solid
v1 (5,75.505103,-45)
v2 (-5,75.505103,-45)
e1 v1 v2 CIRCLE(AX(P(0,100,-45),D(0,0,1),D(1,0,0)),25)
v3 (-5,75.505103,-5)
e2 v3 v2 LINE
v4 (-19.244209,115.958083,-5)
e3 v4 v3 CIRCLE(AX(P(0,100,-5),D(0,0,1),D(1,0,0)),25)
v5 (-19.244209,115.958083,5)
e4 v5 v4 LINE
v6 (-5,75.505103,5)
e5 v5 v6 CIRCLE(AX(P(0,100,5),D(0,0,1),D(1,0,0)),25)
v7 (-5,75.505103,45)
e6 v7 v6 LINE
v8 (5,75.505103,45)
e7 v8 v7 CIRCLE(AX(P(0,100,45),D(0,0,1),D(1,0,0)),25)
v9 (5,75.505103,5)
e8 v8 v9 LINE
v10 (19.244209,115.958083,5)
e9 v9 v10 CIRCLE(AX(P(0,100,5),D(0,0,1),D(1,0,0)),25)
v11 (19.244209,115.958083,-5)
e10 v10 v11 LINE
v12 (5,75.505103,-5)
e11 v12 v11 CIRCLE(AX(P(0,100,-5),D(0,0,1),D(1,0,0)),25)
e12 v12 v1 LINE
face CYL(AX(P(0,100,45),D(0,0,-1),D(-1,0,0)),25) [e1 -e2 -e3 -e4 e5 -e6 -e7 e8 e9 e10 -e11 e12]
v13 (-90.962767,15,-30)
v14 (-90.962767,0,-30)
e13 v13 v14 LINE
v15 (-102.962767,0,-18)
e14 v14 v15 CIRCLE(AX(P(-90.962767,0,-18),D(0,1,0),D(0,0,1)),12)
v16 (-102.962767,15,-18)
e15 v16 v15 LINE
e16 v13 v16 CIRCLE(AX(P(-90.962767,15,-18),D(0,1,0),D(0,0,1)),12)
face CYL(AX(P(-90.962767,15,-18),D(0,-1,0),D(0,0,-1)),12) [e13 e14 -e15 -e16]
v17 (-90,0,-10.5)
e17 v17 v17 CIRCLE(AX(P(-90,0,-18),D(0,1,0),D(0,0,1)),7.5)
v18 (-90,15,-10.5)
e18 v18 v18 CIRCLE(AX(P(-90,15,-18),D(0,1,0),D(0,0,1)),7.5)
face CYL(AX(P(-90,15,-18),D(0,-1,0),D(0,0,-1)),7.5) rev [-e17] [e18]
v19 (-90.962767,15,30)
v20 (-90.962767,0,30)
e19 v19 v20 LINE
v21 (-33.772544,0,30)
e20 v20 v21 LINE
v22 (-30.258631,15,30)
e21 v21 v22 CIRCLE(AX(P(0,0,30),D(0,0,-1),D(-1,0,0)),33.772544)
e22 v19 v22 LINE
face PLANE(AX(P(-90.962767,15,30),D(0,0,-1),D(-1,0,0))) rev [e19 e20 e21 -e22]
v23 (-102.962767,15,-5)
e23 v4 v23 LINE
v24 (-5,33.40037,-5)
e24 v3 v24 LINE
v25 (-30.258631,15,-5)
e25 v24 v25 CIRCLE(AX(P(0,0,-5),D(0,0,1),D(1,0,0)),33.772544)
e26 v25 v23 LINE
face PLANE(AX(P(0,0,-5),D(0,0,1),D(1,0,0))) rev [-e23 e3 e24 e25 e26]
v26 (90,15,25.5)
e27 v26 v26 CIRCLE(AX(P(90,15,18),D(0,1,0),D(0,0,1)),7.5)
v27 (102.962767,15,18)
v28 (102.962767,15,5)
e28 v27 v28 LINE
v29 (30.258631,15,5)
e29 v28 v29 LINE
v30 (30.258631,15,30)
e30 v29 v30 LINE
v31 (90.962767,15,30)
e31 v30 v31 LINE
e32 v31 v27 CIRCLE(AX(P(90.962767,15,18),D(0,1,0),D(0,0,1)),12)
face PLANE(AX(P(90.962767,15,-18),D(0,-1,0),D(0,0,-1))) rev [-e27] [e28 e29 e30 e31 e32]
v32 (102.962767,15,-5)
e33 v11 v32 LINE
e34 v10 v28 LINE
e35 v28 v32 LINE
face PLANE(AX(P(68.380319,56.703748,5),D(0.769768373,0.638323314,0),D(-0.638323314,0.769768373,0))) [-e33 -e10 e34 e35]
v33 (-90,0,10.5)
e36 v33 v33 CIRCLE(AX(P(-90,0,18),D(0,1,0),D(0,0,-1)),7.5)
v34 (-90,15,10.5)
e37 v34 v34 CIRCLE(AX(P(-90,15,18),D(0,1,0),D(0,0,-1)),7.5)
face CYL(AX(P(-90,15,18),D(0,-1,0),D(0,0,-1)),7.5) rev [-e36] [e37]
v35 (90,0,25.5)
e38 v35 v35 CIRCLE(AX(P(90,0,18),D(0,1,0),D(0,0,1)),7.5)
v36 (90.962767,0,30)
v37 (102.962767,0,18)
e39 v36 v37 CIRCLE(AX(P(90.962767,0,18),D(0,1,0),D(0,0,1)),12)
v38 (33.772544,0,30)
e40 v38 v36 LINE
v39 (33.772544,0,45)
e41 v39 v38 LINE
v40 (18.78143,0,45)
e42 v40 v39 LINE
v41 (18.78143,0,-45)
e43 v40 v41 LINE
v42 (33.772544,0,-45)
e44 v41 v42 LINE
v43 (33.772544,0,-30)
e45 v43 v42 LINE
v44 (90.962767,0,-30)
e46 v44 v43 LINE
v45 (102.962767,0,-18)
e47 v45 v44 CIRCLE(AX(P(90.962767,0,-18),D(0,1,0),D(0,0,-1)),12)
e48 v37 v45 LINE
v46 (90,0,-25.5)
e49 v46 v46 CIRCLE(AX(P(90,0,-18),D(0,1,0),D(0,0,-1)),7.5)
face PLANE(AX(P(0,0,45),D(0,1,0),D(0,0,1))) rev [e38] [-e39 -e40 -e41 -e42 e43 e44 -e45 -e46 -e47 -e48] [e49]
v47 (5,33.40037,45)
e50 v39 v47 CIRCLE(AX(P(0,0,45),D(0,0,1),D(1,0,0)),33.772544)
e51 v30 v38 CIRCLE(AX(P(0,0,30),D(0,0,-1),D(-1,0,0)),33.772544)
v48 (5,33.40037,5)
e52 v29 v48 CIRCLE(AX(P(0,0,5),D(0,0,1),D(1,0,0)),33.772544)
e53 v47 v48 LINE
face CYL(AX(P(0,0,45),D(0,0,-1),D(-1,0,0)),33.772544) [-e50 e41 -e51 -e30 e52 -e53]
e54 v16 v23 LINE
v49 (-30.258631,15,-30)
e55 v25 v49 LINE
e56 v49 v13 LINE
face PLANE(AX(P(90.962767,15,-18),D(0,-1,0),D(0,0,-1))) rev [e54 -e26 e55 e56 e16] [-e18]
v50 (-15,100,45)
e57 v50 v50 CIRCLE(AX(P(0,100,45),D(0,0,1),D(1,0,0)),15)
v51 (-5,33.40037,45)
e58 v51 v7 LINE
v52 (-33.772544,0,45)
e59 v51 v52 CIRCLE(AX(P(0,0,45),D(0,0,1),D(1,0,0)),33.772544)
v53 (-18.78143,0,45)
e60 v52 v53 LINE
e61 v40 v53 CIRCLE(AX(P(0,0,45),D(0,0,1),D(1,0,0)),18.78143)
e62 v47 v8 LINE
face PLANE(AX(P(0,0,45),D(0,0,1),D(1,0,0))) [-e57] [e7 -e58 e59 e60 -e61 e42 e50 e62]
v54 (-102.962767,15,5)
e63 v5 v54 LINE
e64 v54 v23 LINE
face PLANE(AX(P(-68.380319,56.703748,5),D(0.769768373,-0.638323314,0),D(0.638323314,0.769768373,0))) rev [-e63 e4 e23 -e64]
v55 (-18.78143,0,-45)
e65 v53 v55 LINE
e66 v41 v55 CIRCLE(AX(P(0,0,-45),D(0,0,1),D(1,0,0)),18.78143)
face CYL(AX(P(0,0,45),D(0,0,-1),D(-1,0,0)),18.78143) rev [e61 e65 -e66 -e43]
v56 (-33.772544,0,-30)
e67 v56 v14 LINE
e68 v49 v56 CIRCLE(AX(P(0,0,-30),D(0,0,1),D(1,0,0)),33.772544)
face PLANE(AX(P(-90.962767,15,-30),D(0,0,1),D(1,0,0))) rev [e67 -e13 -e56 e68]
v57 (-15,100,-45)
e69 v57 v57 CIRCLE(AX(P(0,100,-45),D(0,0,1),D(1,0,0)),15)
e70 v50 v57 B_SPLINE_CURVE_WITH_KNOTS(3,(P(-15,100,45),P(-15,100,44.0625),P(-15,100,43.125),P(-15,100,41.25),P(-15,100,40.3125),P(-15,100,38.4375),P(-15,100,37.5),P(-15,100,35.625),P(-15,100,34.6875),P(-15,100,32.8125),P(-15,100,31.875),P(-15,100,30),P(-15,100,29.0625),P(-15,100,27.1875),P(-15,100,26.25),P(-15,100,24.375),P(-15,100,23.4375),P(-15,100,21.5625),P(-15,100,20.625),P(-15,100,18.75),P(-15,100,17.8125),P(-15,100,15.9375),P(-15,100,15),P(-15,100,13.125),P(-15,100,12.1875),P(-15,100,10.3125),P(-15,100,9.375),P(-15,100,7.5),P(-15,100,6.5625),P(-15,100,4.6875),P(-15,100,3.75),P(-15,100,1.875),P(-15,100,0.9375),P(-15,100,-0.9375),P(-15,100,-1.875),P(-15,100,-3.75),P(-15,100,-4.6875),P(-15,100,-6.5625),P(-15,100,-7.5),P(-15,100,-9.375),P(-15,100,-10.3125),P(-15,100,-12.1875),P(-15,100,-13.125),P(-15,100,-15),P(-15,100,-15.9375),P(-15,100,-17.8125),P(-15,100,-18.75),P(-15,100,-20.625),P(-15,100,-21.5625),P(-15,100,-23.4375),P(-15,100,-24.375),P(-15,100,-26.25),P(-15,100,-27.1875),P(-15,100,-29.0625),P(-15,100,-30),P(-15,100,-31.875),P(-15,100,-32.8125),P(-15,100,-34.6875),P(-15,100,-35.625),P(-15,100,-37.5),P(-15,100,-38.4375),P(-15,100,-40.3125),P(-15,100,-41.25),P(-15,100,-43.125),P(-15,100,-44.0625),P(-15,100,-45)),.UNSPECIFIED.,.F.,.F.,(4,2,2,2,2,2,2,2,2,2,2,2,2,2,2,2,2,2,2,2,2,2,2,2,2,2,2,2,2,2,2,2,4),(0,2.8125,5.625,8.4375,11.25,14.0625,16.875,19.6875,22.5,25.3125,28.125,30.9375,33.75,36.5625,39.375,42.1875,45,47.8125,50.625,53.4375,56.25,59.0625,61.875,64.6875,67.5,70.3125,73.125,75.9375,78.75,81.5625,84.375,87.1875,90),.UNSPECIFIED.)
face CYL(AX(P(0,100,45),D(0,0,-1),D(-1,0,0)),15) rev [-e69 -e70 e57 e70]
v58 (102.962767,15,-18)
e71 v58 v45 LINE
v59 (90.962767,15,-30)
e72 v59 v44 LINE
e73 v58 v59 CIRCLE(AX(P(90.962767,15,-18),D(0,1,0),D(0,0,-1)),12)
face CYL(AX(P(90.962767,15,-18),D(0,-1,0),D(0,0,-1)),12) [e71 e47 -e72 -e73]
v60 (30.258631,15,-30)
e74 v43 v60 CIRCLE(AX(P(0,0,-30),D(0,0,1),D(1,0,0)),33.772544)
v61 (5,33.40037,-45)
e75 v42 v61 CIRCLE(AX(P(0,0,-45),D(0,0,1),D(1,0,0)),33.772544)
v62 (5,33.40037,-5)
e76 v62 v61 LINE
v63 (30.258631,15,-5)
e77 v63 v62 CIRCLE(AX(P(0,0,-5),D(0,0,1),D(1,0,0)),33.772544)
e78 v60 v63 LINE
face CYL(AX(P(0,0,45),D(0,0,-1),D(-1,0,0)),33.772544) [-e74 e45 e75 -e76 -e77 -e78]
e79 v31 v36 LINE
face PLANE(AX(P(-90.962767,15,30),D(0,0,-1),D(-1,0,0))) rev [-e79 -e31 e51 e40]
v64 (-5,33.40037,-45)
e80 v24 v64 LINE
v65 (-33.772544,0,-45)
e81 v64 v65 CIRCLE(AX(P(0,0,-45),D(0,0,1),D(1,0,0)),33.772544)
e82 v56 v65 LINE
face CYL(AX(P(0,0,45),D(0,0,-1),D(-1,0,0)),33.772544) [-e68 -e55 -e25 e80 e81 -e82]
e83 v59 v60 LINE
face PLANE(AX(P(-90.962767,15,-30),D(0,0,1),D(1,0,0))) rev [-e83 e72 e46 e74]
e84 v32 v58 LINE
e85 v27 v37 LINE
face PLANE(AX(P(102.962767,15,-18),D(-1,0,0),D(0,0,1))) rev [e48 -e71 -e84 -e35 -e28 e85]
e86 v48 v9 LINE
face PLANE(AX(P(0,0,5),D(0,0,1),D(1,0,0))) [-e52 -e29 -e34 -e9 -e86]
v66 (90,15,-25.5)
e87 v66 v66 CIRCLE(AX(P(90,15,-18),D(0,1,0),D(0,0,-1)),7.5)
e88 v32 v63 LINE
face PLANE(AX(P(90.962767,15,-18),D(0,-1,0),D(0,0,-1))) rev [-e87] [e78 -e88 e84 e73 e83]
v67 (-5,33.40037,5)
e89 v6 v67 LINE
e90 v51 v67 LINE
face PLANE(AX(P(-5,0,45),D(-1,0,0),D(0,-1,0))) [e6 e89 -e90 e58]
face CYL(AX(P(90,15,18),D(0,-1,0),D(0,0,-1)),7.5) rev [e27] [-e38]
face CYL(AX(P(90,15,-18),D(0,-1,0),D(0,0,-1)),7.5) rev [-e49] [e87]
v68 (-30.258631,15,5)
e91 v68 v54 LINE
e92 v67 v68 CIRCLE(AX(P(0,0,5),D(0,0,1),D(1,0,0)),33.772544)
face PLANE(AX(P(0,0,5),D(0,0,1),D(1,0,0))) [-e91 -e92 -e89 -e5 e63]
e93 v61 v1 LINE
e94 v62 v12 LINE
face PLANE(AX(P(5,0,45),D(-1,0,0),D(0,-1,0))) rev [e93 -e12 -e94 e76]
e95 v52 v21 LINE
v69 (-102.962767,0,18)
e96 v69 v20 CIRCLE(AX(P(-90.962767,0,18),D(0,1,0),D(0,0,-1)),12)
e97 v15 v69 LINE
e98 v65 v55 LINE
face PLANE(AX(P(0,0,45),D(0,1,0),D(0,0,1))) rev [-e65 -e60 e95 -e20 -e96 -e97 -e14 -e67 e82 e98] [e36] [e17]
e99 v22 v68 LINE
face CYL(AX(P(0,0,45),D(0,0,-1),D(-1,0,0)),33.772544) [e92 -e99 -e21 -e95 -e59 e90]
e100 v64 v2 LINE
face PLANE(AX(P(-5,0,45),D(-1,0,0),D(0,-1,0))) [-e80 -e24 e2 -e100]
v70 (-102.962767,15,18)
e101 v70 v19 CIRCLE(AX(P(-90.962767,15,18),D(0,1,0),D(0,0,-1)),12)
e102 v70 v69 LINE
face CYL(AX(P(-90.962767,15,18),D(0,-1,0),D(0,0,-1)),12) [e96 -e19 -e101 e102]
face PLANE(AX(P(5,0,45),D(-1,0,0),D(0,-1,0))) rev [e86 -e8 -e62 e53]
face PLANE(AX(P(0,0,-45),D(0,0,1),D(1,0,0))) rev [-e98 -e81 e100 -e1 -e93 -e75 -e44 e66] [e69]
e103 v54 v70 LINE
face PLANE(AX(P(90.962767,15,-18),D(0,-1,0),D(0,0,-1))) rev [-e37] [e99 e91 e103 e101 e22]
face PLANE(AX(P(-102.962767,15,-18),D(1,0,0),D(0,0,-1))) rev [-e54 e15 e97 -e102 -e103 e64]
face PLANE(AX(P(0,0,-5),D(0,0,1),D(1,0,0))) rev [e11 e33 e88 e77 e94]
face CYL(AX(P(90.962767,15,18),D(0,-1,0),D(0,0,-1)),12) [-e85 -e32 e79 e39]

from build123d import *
from build123d.topology import SkipClean

# Parameters (mm, degrees)
SKETCH1_R           = 15
BOSS_EXTRUDE1_DEPTH = 45
SKETCH4_R           = 7.5
BOSS_EXTRUDE2_DEPTH = 15
CUT_EXTRUDE1_DEPTH  = 179.469413089
BOSS_EXTRUDE3_DEPTH = 5


with BuildPart() as part:
    # Sketch1 → Boss-Extrude1 (new, symmetric)
    with BuildSketch(Plane.XY):
        with BuildLine():
            ThreePointArc((-5, 33.400370285), (-25.587569792, 22.042255042), (-33.772544103, 0))
            Line((-33.772544103, 0), (-18.781429719, 0))
            ThreePointArc((-18.781429719, 0), (0, 18.781429719), (18.781429719, 0))
            Line((18.781429719, 0), (33.772544103, 0))
            ThreePointArc((33.772544103, 0), (25.587569792, 22.042255042), (5, 33.400370285))
            Line((5, 33.400370285), (5, 75.505102572))
            ThreePointArc((5, 75.505102572), (0, 125), (-5, 75.505102572))
            Line((-5, 75.505102572), (-5, 33.400370285))
        make_face()
        with Locations((0, 100)):
            Circle(SKETCH1_R, mode=Mode.SUBTRACT)
    extrude(amount=BOSS_EXTRUDE1_DEPTH, both=True)

    # Sketch4 → Boss-Extrude2 (add)
    with BuildSketch(Plane(origin=(0, 0, 0), x_dir=(1, 0, 0), z_dir=(0, 1, 0))):
        with BuildLine():
            Line((-90.962767097, -30), (90.962767097, -30))
            ThreePointArc((90.962767097, -30), (99.448048472, -26.485281374), (102.962767097, -18))
            Line((102.962767097, -18), (102.962767097, 18))
            ThreePointArc((102.962767097, 18), (99.448048472, 26.485281374), (90.962767097, 30))
            Line((90.962767097, 30), (-90.962767097, 30))
            ThreePointArc((-90.962767097, 30), (-99.448048472, 26.485281374), (-102.962767097, 18))
            Line((-102.962767097, 18), (-102.962767097, -18))
            ThreePointArc((-102.962767097, -18), (-99.448048472, -26.485281374), (-90.962767097, -30))
        make_face()
        with Locations((-90, 18)):
            Circle(SKETCH4_R, mode=Mode.SUBTRACT)
        with Locations((90, 18)):
            Circle(SKETCH4_R, mode=Mode.SUBTRACT)
        with Locations((90, -18)):
            Circle(SKETCH4_R, mode=Mode.SUBTRACT)
        with Locations((-90, -18)):
            Circle(SKETCH4_R, mode=Mode.SUBTRACT)
    extrude(amount=BOSS_EXTRUDE2_DEPTH)

    # Sketch5 → Cut-Extrude1 (cut, through all)
    with SkipClean():  # the faces are left unmerged after this step: merging them gives an invalid solid
        with BuildSketch(Plane.XY.offset(30)):
            with BuildLine():
                Line((-18.781429719, 0), (18.781429719, 0))
                ThreePointArc((18.781429719, 0), (16.807967644, 8.380592221), (11.302305177, 15))
                Line((11.302305177, 15), (-11.302305177, 15))
                ThreePointArc((-11.302305177, 15), (-16.807967644, 8.380592221), (-18.781429719, 0))
            make_face()
        extrude(amount=-CUT_EXTRUDE1_DEPTH, mode=Mode.SUBTRACT)
    add(part.part.scale(1), mode=Mode.REPLACE)  # the faces are merged on a copy

    # Sketch6 → Boss-Extrude3 (add, symmetric)
    with SkipClean():  # the faces are left unmerged after this step: merging them gives an invalid solid
        with BuildSketch(Plane.XY):
            with BuildLine():
                ThreePointArc((-5, 75.505102572), (-23.580846559, 91.696767162), (-19.244209313, 115.95808284))
                Line((-19.244209313, 115.95808284), (-102.962767097, 15))
                Line((-102.962767097, 15), (-30.258630755, 15))
                ThreePointArc((-30.258630755, 15), (-19.885576867, 27.297409545), (-5, 33.400370285))
                Line((-5, 33.400370285), (-5, 75.505102572))
            make_face()
            with BuildLine():
                Line((102.962767097, 15), (19.244209313, 115.95808284))
                ThreePointArc((19.244209313, 115.95808284), (23.580846559, 91.696767162), (5, 75.505102572))
                Line((5, 75.505102572), (5, 33.400370285))
                ThreePointArc((5, 33.400370285), (19.885576867, 27.297409545), (30.258630755, 15))
                Line((30.258630755, 15), (102.962767097, 15))
            make_face()
        extrude(amount=BOSS_EXTRUDE3_DEPTH, both=True)


solid = part.part
